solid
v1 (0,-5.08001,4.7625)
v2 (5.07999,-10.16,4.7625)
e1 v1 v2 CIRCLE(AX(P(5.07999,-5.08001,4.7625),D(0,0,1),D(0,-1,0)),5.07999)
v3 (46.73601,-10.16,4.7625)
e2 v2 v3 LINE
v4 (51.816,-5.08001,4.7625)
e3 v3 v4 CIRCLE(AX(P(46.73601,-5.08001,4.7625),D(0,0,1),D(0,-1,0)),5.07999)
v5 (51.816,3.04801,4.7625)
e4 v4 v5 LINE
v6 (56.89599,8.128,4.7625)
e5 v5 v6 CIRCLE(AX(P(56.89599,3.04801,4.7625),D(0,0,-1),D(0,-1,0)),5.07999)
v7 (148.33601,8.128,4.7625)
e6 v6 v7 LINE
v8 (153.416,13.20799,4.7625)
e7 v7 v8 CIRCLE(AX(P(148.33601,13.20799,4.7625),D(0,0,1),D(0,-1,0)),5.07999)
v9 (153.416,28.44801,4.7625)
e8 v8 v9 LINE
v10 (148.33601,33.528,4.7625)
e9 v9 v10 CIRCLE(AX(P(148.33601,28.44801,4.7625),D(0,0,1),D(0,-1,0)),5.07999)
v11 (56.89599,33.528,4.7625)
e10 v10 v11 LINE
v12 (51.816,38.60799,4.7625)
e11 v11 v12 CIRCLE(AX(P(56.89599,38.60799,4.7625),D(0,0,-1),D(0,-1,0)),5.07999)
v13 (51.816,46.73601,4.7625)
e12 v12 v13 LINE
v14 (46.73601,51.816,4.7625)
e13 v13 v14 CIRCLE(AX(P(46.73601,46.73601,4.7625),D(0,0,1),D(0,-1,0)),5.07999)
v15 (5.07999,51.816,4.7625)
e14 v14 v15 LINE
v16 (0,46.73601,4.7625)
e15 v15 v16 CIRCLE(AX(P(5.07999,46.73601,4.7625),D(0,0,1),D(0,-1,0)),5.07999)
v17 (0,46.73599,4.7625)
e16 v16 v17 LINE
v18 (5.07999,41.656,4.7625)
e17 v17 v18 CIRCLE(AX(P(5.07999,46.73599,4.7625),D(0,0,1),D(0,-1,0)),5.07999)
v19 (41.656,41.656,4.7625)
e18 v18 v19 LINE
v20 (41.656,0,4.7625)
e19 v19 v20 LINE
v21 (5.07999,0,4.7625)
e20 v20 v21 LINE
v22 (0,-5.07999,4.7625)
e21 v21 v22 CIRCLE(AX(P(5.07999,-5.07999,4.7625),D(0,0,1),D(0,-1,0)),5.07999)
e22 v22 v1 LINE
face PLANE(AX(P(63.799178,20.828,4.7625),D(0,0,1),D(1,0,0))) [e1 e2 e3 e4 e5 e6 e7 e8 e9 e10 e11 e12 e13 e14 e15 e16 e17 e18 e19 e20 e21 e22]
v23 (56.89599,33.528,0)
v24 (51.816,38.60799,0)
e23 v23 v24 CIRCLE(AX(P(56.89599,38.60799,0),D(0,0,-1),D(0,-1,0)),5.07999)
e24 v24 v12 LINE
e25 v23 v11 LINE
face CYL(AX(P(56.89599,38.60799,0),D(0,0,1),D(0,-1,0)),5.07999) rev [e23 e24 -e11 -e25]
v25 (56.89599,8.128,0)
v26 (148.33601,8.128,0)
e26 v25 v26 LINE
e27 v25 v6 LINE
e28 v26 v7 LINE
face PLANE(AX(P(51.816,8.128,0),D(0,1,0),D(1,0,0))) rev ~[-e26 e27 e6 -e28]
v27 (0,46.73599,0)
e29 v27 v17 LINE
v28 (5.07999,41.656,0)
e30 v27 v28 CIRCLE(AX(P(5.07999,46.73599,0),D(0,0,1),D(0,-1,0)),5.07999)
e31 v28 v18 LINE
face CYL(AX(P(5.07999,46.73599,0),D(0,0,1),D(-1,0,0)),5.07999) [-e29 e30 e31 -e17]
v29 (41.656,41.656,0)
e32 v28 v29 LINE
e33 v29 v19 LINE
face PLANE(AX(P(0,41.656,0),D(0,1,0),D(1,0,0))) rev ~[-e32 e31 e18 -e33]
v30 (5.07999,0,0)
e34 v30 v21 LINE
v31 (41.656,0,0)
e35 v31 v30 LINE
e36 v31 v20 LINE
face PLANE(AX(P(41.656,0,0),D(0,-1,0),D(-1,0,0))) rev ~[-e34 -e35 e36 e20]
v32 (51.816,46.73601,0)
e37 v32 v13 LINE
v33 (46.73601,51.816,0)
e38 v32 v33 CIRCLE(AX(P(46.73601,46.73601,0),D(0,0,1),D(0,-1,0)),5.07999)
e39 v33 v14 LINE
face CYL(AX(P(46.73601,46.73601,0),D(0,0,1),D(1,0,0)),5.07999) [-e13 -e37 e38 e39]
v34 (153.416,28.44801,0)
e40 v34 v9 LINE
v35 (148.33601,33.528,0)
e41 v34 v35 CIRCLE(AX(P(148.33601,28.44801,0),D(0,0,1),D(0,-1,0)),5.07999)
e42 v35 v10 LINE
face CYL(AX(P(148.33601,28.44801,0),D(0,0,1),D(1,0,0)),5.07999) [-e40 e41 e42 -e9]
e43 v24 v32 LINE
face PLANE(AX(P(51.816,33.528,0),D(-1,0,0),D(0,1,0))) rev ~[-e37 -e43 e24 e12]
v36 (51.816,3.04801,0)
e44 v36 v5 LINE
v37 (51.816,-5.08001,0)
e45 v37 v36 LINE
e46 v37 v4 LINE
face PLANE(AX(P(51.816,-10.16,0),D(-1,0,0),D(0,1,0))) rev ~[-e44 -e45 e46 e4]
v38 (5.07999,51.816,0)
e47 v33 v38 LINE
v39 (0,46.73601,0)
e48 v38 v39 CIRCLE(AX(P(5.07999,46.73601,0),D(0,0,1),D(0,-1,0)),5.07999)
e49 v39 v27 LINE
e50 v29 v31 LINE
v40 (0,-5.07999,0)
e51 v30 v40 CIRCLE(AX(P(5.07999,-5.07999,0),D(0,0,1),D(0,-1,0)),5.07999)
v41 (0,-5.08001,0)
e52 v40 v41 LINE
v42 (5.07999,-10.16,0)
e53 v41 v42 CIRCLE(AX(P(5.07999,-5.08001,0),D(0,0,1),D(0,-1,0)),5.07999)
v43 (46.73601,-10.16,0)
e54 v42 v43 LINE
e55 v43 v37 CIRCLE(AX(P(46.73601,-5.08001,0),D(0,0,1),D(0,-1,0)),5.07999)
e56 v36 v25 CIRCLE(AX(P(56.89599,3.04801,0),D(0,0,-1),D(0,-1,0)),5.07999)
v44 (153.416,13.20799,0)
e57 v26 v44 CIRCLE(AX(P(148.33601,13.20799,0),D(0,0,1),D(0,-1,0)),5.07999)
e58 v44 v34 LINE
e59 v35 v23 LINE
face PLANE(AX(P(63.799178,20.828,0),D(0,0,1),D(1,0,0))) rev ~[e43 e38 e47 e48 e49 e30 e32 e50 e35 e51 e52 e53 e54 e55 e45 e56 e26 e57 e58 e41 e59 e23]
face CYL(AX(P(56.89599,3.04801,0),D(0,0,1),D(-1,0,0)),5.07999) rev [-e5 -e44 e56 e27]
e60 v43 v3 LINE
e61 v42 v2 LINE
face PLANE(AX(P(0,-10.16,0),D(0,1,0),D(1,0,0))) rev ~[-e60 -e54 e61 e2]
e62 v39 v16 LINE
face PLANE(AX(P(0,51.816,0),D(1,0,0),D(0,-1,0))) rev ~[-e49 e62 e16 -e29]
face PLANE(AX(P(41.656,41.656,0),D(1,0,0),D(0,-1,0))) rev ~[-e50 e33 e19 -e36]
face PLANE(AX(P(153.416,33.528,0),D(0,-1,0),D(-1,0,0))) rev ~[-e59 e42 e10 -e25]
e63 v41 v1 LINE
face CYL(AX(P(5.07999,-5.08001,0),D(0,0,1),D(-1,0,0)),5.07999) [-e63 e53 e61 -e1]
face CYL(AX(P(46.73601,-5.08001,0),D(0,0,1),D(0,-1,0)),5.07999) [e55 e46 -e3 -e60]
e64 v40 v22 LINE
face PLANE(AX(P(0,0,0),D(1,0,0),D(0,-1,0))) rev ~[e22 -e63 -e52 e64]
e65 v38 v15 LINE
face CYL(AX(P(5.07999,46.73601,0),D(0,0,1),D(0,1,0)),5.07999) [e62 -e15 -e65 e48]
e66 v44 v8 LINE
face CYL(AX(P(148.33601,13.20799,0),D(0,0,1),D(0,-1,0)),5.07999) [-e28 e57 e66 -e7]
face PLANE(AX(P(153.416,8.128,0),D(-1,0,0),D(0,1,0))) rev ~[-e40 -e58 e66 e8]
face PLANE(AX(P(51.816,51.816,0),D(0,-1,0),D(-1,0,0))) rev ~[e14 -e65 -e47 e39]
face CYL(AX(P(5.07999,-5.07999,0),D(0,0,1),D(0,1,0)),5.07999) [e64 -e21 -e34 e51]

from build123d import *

# Parameters (mm, degrees)
F1_DEPTH = 4.7625
F2_R     = 5.07999


# Not quite as in the source:
# - a fillet or chamfer is up to 0.001 mm smaller than in the source, because OpenCascade refuses the exact size
# - a length typed as a fraction of an inch, garbled in the dataset ("3 / 203.2 mm" for 3/8 in), is restored


with BuildPart() as f1:
    # F0 (on Top) → F1 (new body)
    with BuildSketch(Plane.XY):
        Polygon((41.656, 0), (0, 0), (0, -10.16), (51.816, -10.16), (51.816, 8.128), (153.416, 8.128), (153.416, 33.528), (51.816, 33.528), (51.816, 51.816), (0, 51.816), (0, 41.656), (41.656, 41.656), align=None)
    extrude(amount=F1_DEPTH)

    # F2 (radius 5.08 in the source; OpenCascade refuses exactly that, so slightly less here)
    f2_edges = [f1.edges().sort_by_distance(p)[0] for p in [
        (0, 41.656, 2.38125),
        (0, 51.816, 2.38125),
        (0, 0, 2.38125),
        (0, -10.16, 2.38125),
        (51.816, -10.16, 2.38125),
        (51.816, 8.128, 2.38125),
        (51.816, 33.528, 2.38125),
        (51.816, 51.816, 2.38125),
        (153.416, 33.528, 2.38125),
        (153.416, 8.128, 2.38125),
    ]]
    fillet(f2_edges, radius=F2_R)


solid = f1.part
